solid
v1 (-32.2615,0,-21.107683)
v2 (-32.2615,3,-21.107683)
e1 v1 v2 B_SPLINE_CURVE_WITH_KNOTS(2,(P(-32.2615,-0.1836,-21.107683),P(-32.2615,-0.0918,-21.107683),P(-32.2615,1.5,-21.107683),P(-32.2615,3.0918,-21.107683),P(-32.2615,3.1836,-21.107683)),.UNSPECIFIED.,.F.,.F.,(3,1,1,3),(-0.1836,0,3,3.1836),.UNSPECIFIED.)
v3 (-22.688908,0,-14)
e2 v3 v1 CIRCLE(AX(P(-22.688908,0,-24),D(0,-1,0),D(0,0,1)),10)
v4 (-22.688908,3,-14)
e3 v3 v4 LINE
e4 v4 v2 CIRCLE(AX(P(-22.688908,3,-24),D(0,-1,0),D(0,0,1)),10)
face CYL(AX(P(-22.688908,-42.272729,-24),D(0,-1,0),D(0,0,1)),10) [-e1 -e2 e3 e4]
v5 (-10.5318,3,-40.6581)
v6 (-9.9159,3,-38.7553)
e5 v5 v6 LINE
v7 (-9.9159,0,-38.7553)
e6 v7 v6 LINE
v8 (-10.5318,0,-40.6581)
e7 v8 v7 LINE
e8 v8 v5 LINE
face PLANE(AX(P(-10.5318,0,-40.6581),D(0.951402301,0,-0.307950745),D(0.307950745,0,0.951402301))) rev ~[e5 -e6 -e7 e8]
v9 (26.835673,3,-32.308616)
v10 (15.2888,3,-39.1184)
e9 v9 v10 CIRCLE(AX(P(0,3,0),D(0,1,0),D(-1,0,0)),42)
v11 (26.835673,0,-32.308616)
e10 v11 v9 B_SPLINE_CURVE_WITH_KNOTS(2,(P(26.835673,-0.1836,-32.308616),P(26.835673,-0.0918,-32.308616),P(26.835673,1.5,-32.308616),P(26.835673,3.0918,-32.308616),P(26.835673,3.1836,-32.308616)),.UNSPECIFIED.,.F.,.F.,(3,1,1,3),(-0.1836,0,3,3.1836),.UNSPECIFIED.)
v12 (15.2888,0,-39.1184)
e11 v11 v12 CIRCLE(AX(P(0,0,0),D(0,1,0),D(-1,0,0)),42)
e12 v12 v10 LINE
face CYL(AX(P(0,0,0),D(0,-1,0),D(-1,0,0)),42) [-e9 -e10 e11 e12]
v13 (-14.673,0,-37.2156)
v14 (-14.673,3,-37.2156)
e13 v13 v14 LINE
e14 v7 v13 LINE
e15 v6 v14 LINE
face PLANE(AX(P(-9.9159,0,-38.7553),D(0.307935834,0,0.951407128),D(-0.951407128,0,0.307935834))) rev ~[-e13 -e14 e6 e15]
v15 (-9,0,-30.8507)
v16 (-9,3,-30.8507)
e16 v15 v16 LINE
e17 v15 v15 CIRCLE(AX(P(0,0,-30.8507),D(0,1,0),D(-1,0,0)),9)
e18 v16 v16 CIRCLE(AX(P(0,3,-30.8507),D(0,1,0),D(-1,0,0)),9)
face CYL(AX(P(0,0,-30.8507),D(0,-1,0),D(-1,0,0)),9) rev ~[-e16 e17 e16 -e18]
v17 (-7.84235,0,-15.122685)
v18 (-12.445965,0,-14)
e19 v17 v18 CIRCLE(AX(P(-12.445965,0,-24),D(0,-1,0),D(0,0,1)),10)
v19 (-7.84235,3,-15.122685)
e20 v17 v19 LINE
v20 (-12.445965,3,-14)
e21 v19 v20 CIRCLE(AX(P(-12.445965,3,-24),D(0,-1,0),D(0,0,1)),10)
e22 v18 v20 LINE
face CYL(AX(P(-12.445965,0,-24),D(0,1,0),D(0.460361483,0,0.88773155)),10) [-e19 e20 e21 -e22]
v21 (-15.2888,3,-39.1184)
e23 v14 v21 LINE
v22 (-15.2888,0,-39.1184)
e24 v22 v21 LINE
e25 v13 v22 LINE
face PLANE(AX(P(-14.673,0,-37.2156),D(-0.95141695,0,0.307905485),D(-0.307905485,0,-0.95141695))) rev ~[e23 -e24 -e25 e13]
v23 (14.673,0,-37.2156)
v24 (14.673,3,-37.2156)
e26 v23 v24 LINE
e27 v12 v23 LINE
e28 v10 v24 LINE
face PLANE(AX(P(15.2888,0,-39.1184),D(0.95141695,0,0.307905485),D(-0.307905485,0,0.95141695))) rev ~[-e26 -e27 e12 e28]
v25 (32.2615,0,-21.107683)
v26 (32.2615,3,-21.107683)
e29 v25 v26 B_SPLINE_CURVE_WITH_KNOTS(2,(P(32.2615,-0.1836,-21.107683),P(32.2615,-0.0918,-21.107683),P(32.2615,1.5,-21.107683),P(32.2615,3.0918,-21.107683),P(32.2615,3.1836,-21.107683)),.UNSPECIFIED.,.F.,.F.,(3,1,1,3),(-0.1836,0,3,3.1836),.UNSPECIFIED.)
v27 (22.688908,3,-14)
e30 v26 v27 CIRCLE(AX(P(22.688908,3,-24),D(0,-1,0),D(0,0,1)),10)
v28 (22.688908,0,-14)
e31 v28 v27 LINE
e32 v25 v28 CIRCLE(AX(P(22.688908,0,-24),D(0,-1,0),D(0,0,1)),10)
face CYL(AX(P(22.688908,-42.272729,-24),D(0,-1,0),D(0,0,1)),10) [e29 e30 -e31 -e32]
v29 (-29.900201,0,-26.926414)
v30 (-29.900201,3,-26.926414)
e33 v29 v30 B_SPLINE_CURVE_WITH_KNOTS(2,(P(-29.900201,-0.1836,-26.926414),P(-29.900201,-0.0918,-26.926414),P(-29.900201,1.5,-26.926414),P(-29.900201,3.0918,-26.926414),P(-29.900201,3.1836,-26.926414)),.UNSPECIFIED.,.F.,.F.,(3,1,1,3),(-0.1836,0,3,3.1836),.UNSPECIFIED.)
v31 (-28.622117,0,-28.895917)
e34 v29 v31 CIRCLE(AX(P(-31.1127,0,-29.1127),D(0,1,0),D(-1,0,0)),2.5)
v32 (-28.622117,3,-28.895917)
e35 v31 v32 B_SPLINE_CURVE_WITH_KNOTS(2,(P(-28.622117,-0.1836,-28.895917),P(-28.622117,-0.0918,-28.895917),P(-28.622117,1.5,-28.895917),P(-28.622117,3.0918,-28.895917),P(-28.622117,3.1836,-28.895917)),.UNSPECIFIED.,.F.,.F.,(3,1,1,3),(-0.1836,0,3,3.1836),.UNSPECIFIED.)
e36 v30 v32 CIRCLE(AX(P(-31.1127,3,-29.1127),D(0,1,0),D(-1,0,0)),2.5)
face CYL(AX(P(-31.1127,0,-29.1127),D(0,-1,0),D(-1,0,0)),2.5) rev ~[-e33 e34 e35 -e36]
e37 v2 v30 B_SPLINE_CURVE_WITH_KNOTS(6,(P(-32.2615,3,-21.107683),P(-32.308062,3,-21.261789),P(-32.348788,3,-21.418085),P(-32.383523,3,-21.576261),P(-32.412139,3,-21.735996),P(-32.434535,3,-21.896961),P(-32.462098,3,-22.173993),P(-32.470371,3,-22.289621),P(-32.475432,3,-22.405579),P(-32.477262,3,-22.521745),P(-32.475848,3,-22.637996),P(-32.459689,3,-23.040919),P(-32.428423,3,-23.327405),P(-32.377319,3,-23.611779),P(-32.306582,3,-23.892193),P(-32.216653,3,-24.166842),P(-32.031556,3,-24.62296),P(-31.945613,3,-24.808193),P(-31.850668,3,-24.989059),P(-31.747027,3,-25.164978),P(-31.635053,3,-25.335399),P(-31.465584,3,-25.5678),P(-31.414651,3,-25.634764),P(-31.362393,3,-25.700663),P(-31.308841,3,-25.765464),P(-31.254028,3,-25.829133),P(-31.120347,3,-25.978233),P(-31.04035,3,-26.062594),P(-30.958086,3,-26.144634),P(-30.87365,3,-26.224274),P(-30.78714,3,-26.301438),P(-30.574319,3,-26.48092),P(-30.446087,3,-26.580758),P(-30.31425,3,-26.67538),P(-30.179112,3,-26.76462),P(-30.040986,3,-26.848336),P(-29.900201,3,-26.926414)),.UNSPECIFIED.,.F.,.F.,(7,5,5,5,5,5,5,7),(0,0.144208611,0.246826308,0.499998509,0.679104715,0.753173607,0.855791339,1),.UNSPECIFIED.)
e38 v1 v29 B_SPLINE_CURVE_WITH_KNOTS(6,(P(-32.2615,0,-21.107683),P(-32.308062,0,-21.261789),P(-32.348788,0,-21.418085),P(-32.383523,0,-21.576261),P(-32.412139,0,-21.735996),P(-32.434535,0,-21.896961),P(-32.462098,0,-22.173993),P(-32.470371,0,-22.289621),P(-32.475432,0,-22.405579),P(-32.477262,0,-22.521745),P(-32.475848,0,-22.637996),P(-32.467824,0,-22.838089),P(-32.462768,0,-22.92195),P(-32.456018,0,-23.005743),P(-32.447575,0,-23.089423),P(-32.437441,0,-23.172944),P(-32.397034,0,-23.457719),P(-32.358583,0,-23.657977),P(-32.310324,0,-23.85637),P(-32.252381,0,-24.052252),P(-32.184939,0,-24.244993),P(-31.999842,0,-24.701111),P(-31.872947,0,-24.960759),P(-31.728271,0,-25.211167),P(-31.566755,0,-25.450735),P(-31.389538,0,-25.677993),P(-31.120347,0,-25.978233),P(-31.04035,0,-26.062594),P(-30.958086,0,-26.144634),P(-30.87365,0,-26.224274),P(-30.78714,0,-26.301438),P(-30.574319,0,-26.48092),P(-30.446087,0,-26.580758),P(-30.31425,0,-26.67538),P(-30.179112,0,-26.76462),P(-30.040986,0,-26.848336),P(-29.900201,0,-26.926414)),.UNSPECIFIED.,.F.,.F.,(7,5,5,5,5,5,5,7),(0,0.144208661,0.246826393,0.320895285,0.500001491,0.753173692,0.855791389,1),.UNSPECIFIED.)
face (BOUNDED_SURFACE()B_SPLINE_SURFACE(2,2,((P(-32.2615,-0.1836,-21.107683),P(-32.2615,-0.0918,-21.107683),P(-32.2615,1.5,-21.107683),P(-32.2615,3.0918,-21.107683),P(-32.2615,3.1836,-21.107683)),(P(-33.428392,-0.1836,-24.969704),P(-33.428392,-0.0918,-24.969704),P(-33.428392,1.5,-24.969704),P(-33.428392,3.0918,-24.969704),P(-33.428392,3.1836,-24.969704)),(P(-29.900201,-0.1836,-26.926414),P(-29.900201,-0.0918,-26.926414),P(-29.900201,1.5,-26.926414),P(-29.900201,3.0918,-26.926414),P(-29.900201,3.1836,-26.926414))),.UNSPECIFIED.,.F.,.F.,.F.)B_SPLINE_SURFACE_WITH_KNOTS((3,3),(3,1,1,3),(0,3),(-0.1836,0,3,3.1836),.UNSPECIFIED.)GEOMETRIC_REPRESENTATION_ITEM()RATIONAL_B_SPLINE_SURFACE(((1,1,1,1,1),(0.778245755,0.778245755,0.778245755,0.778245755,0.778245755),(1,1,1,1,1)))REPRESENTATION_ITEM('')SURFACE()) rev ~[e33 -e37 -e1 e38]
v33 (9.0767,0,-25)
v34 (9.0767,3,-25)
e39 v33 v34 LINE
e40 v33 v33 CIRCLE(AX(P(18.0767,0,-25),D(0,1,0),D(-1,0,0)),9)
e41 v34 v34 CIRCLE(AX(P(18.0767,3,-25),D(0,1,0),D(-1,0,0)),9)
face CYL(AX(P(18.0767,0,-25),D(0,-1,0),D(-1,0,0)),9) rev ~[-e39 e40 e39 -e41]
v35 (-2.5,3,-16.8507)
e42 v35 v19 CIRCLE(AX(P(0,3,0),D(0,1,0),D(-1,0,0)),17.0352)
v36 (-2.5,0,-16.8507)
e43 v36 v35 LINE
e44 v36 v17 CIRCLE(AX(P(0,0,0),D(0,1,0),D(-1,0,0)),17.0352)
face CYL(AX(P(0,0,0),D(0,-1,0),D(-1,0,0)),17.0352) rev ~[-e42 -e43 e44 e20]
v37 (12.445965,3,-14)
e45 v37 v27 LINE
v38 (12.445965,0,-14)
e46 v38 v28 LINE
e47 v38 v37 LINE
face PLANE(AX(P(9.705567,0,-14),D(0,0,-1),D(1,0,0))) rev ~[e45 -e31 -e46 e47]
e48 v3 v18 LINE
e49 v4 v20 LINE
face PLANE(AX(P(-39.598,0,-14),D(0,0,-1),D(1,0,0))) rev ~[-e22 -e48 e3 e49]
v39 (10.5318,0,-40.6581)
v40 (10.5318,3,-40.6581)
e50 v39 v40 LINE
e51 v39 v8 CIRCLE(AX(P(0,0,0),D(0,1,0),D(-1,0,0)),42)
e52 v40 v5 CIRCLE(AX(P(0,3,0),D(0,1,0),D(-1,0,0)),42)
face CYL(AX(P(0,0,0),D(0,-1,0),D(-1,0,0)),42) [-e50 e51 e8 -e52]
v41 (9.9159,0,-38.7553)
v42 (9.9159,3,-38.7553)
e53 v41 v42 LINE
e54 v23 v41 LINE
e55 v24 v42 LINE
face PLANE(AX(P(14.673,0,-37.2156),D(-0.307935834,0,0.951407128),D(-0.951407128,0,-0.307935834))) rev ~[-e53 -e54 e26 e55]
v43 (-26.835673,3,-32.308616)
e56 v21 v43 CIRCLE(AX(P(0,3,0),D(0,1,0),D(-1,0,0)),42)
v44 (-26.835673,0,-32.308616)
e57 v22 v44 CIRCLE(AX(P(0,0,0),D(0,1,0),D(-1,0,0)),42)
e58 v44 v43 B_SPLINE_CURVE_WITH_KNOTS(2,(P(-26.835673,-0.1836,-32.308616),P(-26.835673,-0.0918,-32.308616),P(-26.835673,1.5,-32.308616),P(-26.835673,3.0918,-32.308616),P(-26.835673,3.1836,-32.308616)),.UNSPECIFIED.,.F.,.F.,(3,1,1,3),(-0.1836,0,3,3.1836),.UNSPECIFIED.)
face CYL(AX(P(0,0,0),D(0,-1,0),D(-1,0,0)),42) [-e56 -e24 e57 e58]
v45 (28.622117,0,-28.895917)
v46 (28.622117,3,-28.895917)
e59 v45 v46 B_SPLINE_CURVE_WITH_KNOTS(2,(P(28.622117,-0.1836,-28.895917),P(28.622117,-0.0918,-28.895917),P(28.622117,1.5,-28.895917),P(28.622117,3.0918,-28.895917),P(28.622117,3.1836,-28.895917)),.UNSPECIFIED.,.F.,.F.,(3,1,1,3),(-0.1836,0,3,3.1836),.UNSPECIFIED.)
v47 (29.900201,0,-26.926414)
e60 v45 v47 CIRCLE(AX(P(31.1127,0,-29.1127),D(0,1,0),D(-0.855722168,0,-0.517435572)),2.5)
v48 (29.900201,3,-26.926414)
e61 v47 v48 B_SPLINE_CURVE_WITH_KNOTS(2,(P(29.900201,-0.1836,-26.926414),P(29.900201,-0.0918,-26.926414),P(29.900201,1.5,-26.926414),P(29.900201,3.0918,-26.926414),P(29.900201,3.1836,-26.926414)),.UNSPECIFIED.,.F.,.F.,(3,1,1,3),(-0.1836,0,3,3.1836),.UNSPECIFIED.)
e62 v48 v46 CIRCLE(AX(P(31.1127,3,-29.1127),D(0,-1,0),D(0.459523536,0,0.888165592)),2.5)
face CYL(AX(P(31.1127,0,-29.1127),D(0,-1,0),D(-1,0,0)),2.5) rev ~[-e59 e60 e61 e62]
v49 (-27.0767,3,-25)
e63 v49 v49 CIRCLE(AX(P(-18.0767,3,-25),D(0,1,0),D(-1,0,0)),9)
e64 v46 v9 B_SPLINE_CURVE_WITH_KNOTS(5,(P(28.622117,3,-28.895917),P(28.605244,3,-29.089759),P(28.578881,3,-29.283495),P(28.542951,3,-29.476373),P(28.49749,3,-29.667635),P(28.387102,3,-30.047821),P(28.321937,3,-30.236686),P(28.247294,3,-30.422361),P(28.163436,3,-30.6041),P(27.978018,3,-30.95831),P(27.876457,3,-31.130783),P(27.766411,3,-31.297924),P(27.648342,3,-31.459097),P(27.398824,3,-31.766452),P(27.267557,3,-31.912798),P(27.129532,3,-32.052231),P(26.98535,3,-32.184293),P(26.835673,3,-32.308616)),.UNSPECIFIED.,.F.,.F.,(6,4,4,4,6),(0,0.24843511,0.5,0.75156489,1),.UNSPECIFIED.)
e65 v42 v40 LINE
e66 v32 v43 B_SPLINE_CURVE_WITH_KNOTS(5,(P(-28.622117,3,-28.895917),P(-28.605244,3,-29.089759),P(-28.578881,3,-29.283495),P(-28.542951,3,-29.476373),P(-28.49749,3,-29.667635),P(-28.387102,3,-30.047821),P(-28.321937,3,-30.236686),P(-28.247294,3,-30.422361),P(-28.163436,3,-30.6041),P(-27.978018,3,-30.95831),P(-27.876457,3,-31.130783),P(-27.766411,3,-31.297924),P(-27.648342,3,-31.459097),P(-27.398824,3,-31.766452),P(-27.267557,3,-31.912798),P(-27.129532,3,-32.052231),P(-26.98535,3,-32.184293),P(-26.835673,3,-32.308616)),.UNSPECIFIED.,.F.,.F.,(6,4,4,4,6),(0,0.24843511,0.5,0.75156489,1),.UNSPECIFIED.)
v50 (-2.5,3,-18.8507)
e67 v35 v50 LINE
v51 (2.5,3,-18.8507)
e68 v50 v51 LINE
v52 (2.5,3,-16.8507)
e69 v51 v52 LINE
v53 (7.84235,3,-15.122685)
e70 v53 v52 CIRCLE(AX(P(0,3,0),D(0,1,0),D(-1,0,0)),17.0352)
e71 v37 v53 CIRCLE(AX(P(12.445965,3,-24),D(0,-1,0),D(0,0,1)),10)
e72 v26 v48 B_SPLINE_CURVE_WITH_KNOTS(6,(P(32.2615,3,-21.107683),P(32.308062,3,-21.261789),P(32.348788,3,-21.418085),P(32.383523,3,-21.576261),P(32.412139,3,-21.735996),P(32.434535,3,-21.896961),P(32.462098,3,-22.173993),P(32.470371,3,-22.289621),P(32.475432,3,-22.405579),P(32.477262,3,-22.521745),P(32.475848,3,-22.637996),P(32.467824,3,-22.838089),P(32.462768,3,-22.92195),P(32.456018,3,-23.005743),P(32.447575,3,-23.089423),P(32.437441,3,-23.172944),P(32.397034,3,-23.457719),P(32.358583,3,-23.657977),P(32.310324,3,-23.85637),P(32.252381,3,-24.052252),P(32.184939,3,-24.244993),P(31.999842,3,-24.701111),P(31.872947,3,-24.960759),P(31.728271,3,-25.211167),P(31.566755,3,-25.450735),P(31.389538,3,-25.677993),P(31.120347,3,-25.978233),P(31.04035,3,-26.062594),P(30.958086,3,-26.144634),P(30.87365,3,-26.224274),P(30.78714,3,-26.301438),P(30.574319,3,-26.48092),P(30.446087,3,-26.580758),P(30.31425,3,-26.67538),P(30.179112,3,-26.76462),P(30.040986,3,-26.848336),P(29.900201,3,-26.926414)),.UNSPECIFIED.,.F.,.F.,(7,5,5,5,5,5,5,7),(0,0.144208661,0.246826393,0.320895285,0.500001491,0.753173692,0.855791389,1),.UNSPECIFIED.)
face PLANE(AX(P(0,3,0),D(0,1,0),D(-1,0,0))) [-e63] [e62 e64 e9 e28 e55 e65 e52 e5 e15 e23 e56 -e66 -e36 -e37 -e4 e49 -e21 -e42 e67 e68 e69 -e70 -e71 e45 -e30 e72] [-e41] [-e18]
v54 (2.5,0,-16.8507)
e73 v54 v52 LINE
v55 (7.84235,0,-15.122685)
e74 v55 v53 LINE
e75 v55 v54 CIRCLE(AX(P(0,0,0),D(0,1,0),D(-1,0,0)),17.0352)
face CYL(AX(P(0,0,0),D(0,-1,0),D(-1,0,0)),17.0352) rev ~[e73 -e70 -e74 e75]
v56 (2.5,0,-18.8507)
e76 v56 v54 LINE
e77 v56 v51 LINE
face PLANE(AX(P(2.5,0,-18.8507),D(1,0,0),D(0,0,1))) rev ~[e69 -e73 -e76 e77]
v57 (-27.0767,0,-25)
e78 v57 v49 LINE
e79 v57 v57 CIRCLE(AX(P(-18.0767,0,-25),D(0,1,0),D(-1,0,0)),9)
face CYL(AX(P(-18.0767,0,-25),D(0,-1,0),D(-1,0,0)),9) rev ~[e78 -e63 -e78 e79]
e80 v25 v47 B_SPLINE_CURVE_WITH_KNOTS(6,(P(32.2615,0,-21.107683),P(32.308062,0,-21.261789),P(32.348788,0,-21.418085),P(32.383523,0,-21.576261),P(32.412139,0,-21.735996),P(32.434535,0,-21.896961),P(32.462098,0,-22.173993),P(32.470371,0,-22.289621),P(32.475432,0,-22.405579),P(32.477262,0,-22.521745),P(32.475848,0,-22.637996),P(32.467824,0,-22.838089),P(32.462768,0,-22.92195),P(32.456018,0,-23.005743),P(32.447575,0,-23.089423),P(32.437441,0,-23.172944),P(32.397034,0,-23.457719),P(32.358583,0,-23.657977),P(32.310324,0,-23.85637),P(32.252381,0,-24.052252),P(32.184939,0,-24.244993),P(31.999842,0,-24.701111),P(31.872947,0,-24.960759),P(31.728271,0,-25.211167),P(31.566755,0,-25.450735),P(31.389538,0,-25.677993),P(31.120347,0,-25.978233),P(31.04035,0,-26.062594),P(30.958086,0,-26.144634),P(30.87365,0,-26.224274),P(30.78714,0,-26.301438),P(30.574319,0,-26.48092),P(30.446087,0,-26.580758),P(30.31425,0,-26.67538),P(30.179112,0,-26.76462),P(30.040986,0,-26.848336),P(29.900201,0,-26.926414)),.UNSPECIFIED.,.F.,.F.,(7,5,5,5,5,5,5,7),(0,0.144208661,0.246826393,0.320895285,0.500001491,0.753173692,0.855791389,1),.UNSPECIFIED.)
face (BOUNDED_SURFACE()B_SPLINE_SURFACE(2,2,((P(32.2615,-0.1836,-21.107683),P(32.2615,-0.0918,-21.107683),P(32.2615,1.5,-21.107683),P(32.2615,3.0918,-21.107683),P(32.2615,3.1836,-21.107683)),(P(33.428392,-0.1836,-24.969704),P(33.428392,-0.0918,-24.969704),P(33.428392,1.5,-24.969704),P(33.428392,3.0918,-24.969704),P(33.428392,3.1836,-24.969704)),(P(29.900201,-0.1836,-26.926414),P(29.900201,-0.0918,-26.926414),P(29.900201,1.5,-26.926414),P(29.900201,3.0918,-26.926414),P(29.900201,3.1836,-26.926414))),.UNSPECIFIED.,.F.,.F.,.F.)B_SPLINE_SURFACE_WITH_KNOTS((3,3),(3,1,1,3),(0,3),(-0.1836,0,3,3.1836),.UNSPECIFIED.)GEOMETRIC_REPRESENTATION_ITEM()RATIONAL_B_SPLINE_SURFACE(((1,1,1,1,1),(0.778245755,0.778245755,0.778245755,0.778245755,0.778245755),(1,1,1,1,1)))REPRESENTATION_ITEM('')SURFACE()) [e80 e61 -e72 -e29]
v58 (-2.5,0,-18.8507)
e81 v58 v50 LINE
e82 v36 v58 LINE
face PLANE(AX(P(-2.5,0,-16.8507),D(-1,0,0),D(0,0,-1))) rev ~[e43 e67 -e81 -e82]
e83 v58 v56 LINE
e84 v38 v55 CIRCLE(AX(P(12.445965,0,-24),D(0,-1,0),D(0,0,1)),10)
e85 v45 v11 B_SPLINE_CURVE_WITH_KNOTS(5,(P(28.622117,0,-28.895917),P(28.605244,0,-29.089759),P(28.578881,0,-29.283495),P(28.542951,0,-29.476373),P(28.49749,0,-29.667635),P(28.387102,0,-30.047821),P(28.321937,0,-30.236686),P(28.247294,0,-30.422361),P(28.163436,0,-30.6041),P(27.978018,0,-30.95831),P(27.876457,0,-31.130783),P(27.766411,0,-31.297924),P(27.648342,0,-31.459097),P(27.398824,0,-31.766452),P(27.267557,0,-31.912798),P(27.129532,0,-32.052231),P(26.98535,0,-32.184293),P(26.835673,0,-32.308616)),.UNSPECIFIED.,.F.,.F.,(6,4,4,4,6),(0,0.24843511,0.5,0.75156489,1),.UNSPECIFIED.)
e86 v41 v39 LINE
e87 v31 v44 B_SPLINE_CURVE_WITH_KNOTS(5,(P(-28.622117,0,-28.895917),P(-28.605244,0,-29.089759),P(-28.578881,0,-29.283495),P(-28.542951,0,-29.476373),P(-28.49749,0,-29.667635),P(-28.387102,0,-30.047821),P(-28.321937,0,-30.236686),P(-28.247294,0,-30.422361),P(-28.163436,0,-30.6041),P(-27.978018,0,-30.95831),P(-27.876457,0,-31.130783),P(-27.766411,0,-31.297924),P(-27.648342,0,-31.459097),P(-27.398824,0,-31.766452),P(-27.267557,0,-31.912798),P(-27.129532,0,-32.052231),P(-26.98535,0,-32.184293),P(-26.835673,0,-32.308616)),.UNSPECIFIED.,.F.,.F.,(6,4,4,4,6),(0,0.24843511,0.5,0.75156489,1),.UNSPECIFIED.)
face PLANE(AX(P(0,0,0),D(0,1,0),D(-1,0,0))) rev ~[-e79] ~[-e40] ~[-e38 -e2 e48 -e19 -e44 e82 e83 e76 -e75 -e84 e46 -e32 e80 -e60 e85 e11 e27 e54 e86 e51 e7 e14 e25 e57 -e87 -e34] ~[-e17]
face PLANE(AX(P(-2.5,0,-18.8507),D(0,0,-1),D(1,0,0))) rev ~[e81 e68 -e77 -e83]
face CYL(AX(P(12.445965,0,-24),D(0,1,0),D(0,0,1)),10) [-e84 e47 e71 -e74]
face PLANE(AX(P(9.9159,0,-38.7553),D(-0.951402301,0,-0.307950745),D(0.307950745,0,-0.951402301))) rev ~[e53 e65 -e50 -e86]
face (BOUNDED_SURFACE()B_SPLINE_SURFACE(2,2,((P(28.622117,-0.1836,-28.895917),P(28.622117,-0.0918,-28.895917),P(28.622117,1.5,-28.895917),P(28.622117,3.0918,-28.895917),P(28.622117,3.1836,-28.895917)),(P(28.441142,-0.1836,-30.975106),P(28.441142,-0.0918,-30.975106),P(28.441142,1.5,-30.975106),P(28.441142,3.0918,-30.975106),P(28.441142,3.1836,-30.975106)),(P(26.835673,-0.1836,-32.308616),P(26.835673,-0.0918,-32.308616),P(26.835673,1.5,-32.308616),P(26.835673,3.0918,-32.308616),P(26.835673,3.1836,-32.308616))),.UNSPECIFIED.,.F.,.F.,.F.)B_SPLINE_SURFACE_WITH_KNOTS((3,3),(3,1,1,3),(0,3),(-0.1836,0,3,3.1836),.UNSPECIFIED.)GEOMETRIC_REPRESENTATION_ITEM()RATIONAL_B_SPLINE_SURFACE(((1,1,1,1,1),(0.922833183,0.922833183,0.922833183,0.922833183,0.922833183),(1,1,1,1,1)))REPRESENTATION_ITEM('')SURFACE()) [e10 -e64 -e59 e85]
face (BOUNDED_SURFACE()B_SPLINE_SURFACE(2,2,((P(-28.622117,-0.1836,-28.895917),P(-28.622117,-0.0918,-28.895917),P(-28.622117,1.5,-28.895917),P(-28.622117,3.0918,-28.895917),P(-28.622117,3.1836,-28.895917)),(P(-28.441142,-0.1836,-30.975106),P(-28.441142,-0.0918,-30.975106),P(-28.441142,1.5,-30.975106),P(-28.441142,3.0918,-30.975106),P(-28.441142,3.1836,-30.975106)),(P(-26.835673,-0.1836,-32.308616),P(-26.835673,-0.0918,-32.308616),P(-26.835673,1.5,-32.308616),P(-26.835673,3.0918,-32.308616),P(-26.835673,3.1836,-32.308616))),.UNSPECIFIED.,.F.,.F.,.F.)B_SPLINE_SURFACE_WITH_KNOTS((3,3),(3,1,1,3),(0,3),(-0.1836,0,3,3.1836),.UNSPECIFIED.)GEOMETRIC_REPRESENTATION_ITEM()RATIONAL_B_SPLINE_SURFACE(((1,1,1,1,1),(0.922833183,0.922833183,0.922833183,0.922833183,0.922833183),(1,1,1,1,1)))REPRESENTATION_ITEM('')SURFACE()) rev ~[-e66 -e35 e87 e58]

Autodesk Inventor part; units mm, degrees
ref_plane "YZ Plane" through (0, 0, 0) normal (1, 0, 0) x (0, 1, 0)
ref_plane "XZ Plane" through (0, 0, 0) normal (0, 1, 0) x (-1, 0, 0)
ref_plane "XY Plane" through (0, 0, 0) normal (0, 0, 1) x (1, 0, 0)
sketch "Эскиз1" plane through (0, 0, 0) normal (0, 1, 0) x (-1, 0, 0)
  circle A0 centre (0, 0) radius 42
  line L0 (0, -42) -> (0, 42) construction
  circle A1 centre (18.0767, -25) radius 9
  circle A2 centre (-18.0767, -25) radius 9
  line L1 (39.598, -14) -> (-39.598, -14)
  circle A3 centre (0, -30.8507) radius 9
  circle A4 centre (0, 0) radius 30.8507 construction
  line L2 (0, 0) -> (12.9332, -39.9591) construction
  line L3 (0, 0) -> (-12.9332, -39.9591) construction
  line L4 (9.9159, -38.7553) -> (14.673, -37.2156)
  line L5 (14.673, -37.2156) -> (15.2888, -39.1184)
  line L6 (15.2888, -39.1184) -> (10.5318, -40.6581)
  line L7 (10.5318, -40.6581) -> (9.9159, -38.7553)
  line L8 (9.9159, -38.7553) -> (15.2888, -39.1184) construction
  line L9 (14.673, -37.2156) -> (10.5318, -40.6581) construction
  line L10 (-14.673, -37.2156) -> (-9.9159, -38.7553)
  line L11 (-9.9159, -38.7553) -> (-10.5318, -40.6581)
  line L12 (-10.5318, -40.6581) -> (-15.2888, -39.1184)
  line L13 (-15.2888, -39.1184) -> (-14.673, -37.2156)
  line L14 (-14.673, -37.2156) -> (-10.5318, -40.6581) construction
  line L15 (-9.9159, -38.7553) -> (-15.2888, -39.1184) construction
  line L16 (-2.5, -16.8507) -> (2.5, -16.8507)
  line L17 (2.5, -16.8507) -> (2.5, -18.8507)
  line L18 (2.5, -18.8507) -> (-2.5, -18.8507)
  line L19 (-2.5, -18.8507) -> (-2.5, -16.8507)
  line L20 (-2.5, -16.8507) -> (2.5, -18.8507) construction
  line L21 (2.5, -16.8507) -> (-2.5, -18.8507) construction
  circle A5 centre (0, 0) radius 17.0352
  circle A6 centre (0, 2) radius 44 construction
  circle A7 centre (31.1127, -29.1127) radius 2.5
  circle A8 centre (-31.1127, -29.1127) radius 2.5
  point P0 (12.6024, -38.9369)
  point P1 (-12.6024, -38.9369)
  point P2 (0, -17.8507)
  point P3 (9.7056, -14)
  point P4 (2.5, -16.8507)
  point P5 (-9.7056, -14)
  point P6 (-15.2888, -39.1184)
  point P7 (10.5318, -40.6581)
  point P8 (28.9734, -30.4063)
  point P9 (32.2615, -26.8923)
  point P10 (-32.2615, -26.8923)
  point P11 (-28.9734, -30.4063)
  dimension "d0" = 84
  dimension "d5" = 18
  dimension "d7" = 14
  dimension "d8" = 11
  dimension "d9" = 19
  dimension "d13" = 35.87
  dimension "d14" = 17.935
  dimension "d15" = 2
  dimension "d16" = 2
  dimension "d17" = 5
  dimension "d18" = 5
  dimension "d19" = 5
  dimension "d20" = 2
  dimension "d21" = 13
  dimension "d26" = 2
  dimension "d27" = 88
  dimension "d28" = 5
  dimension "d29" = 90
extrude "Выдавливание2" add sketch "Эскиз1" along normal blind 3 contours L1 A5 L19 L18 L17 A0 A7 L5 L4 L7 L11 L10 L13 A8
fillet "Сопряжение1" radius 10 2 edges at (-39.598, 1.5, -14) (39.598, 1.5, -14)
fillet "Сопряжение2" radius 10 2 edges at (-9.7056, 1.5, -14) (9.7056, 1.5, -14)
fillet "Сопряжение3" radius 5 4 edges at (28.9734, 1.5, -30.4063) (32.2615, 1.5, -26.8923) (-28.9734, 1.5, -30.4063) (-32.2615, 1.5, -26.8923)
equation "\"d14\" = 0.5 * d13"
properties part number "Крепление АКБ" material "Пластик АБС"
